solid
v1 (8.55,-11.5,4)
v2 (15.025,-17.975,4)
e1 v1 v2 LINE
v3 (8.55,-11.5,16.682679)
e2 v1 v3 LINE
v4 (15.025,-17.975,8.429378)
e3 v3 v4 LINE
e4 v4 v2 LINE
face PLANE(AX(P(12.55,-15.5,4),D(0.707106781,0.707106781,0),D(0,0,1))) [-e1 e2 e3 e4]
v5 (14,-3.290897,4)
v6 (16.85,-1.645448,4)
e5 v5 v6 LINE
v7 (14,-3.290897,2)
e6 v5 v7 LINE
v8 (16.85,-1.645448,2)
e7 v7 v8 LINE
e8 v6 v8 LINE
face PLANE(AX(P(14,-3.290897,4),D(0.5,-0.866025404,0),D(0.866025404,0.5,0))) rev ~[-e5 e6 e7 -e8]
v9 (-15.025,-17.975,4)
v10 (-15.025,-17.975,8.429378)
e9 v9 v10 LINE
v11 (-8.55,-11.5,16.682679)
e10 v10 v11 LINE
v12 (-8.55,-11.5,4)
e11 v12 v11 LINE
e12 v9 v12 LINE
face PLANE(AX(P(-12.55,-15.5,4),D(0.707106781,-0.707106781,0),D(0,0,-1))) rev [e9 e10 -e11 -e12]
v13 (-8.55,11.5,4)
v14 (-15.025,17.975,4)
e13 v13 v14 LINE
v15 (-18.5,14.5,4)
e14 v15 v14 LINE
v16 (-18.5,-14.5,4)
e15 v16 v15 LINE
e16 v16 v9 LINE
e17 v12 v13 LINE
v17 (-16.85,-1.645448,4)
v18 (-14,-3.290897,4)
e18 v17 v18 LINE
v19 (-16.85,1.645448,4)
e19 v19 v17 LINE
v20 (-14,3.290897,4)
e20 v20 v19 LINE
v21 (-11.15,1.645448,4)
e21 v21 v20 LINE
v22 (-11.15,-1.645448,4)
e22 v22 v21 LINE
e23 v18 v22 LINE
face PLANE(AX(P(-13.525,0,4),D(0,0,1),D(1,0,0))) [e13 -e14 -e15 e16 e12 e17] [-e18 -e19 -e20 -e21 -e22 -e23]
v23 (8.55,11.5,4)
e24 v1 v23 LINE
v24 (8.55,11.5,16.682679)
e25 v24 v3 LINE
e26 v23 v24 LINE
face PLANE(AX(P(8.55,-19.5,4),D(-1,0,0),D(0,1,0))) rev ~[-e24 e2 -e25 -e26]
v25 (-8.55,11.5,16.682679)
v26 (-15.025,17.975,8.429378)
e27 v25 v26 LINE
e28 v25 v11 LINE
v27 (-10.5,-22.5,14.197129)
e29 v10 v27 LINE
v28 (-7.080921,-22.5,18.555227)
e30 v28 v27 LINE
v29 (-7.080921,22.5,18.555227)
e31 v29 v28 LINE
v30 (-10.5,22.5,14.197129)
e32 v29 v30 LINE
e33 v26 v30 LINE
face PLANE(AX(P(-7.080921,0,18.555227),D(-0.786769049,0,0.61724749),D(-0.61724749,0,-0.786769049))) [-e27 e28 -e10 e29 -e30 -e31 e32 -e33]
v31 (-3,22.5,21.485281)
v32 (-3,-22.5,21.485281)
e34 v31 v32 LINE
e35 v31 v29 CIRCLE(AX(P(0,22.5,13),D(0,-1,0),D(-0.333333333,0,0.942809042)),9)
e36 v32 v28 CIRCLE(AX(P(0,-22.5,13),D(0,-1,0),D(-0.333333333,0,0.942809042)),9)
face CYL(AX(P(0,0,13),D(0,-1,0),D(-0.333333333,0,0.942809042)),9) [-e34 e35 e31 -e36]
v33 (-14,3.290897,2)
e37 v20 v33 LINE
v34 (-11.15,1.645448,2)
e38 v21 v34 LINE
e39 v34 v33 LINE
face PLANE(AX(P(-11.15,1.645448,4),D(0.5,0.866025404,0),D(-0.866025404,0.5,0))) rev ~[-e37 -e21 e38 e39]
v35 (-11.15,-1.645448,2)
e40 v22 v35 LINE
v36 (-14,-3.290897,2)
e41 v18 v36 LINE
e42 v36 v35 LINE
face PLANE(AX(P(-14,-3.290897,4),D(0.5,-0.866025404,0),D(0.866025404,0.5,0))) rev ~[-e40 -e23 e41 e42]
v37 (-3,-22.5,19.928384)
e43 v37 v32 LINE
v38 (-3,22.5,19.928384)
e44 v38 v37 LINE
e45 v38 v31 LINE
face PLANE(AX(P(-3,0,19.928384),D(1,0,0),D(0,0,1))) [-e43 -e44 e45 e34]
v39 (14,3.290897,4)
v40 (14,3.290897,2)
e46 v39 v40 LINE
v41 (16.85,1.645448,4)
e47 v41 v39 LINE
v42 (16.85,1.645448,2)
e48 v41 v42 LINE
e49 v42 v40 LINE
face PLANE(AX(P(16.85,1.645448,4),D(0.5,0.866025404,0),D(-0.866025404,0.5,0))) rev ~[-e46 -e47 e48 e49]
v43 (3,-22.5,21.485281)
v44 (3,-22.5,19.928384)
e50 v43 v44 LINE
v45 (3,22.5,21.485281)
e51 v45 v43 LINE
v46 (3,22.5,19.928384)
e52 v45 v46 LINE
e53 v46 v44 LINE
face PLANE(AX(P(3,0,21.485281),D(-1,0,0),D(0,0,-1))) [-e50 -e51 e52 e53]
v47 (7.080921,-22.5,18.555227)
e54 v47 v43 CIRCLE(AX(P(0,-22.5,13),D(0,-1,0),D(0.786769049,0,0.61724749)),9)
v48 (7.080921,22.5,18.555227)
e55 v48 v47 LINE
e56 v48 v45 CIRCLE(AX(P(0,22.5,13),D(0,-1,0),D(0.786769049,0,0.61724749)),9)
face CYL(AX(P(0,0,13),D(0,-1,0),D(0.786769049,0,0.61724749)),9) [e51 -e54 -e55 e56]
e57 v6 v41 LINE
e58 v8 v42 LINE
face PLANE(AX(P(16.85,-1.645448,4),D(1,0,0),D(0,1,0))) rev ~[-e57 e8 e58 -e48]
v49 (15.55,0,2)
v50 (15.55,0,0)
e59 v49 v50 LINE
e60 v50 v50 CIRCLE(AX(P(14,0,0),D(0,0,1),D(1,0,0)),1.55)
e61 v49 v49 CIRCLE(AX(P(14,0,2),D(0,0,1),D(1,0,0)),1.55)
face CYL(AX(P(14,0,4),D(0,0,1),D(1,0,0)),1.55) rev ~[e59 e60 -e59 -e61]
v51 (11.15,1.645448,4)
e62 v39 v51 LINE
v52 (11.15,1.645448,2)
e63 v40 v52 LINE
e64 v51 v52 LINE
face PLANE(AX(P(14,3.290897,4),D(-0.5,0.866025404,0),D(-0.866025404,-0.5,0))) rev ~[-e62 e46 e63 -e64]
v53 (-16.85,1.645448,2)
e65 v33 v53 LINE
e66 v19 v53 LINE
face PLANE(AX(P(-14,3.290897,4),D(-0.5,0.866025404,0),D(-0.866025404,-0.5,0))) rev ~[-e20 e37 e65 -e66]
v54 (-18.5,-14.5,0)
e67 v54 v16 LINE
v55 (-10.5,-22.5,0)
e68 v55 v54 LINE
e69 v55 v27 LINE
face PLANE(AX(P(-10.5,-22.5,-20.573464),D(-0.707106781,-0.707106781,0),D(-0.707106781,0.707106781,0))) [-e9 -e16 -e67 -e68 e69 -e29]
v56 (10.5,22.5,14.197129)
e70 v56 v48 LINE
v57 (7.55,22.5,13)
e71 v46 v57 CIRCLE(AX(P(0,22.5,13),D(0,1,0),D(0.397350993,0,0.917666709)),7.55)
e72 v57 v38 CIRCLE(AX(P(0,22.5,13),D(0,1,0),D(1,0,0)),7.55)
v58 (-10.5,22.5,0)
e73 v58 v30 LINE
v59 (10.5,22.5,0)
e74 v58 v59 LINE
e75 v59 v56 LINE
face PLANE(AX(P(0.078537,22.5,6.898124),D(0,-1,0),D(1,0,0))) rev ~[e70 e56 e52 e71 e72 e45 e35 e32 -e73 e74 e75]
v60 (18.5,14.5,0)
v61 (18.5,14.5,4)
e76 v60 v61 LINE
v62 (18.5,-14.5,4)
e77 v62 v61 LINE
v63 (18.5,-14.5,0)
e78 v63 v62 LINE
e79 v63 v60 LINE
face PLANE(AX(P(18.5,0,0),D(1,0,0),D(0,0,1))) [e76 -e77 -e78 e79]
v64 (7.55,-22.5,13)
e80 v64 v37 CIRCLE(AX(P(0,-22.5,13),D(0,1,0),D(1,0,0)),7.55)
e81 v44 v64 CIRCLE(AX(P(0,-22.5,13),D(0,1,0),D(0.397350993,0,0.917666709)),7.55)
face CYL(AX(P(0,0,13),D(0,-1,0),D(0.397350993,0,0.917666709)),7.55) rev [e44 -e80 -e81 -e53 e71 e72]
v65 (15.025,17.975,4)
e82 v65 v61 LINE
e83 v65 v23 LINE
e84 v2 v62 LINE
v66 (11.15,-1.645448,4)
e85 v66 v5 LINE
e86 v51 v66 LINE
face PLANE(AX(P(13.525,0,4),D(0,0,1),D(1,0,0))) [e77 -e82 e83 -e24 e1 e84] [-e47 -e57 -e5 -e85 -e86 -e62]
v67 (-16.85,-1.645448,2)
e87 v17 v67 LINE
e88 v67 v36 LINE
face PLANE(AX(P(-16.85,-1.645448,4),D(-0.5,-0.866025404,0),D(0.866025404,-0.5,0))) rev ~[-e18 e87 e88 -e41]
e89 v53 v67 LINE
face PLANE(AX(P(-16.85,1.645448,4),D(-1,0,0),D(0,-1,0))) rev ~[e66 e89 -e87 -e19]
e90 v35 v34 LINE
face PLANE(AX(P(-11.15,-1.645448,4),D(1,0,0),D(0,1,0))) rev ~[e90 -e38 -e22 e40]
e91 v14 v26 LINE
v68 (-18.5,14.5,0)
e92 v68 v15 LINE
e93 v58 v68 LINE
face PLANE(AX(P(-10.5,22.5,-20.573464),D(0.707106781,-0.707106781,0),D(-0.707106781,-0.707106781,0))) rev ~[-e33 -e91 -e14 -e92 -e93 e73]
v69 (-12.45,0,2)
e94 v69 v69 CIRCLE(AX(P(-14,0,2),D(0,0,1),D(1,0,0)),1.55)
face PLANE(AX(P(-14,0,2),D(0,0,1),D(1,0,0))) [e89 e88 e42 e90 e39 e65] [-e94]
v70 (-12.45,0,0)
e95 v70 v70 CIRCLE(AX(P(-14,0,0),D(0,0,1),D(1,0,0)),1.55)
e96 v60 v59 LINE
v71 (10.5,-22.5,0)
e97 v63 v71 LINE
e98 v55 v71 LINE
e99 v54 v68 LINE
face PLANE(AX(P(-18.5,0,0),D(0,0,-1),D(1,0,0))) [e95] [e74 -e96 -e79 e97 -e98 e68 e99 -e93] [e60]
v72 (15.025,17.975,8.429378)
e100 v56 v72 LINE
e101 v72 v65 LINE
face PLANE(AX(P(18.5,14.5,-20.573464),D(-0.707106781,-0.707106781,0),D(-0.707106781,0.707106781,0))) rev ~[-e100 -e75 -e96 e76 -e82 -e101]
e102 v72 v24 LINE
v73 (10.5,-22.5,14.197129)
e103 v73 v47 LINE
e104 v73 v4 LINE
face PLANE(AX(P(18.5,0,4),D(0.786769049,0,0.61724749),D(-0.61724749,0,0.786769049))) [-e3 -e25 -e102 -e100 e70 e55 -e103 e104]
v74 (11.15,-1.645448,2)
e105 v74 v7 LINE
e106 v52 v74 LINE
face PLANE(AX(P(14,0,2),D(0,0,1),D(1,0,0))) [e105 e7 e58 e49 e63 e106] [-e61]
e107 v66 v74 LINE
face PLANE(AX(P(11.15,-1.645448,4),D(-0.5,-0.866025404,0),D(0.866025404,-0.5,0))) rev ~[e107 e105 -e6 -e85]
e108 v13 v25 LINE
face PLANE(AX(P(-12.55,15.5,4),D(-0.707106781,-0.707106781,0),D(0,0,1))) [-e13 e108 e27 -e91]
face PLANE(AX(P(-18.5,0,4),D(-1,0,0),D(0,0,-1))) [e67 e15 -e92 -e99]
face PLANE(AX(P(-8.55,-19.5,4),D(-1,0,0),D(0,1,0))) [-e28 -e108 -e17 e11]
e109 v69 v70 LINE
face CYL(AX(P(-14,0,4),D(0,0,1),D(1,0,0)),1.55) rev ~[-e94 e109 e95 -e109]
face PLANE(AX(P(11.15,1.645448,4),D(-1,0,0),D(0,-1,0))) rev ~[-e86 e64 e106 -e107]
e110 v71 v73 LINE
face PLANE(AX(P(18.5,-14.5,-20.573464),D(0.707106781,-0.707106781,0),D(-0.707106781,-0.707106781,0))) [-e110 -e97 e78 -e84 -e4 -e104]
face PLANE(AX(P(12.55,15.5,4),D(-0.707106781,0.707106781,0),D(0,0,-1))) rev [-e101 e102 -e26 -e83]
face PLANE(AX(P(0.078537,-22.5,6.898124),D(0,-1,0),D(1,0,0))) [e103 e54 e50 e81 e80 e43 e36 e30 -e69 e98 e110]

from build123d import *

# Parameters (mm, degrees)
F1_DEPTH    = 22.5
F3_W        = 9.95
F3_H        = 39
F4_DEPTH    = 12.6836794258
F5_R        = 1.55
F6_DEPTH    = 4
F7_DEPTH    = 2
F8_SIZE2    = 8
F8_SIZE     = 8
F9_T1_DEPTH = 45.1469278075


# Not quite as in the source:
# - a fillet or chamfer that OpenCascade refuses, or shapes differently, is made with other operations: its cross-section is extruded or revolved along the edge and cut away or added


with BuildPart() as f1:
    # F0 (on Front) → F1 (new body, symmetric)
    with BuildSketch(Plane.XZ):
        with BuildLine():
            Line((18.5, 4), (7.0809214412, 18.555227407))
            ThreePointArc((7.0809214412, 18.555227407), (8.5067118492, 15.9386822752), (9, 13))
            ThreePointArc((9, 13), (-2.9386822752, 4.4932881508), (-7.0809214412, 18.555227407))
            Line((-7.0809214412, 18.555227407), (-18.5, 4))
            Line((-18.5, 4), (-18.5, 0))
            Line((-18.5, 0), (18.5, 0))
            Line((18.5, 0), (18.5, 4))
        make_face()
        with BuildLine():
            ThreePointArc((3, 19.9283836499), (6.3108042277, 17.1444239648), (7.55, 13))
            ThreePointArc((7.55, 13), (-4.1444239648, 6.6891957723), (-3, 19.9283836499))
            Line((-3, 19.9283836499), (-3, 21.4852813742))
            ThreePointArc((-3, 21.4852813742), (-5.2490521372, 20.3107764062), (-7.0809214412, 18.555227407))
            ThreePointArc((-7.0809214412, 18.555227407), (-2.9386822752, 4.4932881508), (9, 13))
            ThreePointArc((9, 13), (8.5067118492, 15.9386822752), (7.0809214412, 18.555227407))
            ThreePointArc((7.0809214412, 18.555227407), (5.2490521372, 20.3107764062), (3, 21.4852813742))
            Line((3, 21.4852813742), (3, 19.9283836499))
        make_face()
    extrude(amount=F1_DEPTH, both=True)

    # F3 (on offset) → F4 (cut, through all)
    with BuildSketch(Plane.XY.offset(4)):
        with Locations((-13.525, 0)):
            Rectangle(F3_W, F3_H)
        with Locations((13.525, 0)):
            Rectangle(F3_W, F3_H)
    extrude(amount=F4_DEPTH, mode=Mode.SUBTRACT)

    # F5 (on face) → F6 (cut, through all)
    with BuildSketch(Plane.XY.offset(4)):
        with Locations((14, 0)):
            Circle(F5_R)
        with Locations((-14, 0)):
            Circle(F5_R)
    extrude(amount=-F6_DEPTH, mode=Mode.SUBTRACT)

    # F5 (on face) → F7 (cut)
    with BuildSketch(Plane.XY.offset(4)):
        Polygon((11.15, 1.6454482672), (11.15, -1.6454482672), (14, -3.2908965344), (16.85, -1.6454482672), (16.85, 1.6454482672), (14, 3.2908965344), align=None)
        with Locations((14, 0)):
            Circle(F5_R, mode=Mode.SUBTRACT)
        Polygon((-11.15, -1.6454482672), (-11.15, 1.6454482672), (-14, 3.2908965344), (-16.85, 1.6454482672), (-16.85, -1.6454482672), (-14, -3.2908965344), align=None)
        with Locations((-14, 0)):
            Circle(F5_R, mode=Mode.SUBTRACT)
    extrude(amount=-F7_DEPTH, mode=Mode.SUBTRACT)

    # F8
    f8_edges = [f1.edges().sort_by_distance(p)[0] for p in [
        (-8.55, 19.5, 10.34134),
        (-8.55, -19.5, 10.34134),
        (8.55, 19.5, 10.34134),
        (8.55, -19.5, 10.34134),
    ]]
    chamfer(f8_edges, length=F8_SIZE, length2=F8_SIZE2)

    # F9: chamfer of 8 on 4 edges, made by hand

    # F9_s2 → F9_t1 (cut)
    with BuildSketch(Plane.XY.offset(-20.5734639037)):
        Polygon((-10.5, 22.5), (-18.5, 14.5), (-18.5, 22.5), align=None)
        Polygon((-10.5, -22.5), (-18.5, -14.5), (-18.5, -22.5), align=None)
        Polygon((18.5, 14.5), (10.5, 22.5), (18.5, 22.5), align=None)
        Polygon((18.5, -14.5), (10.5, -22.5), (18.5, -22.5), align=None)
    extrude(amount=F9_T1_DEPTH, mode=Mode.SUBTRACT)


solid = f1.part
